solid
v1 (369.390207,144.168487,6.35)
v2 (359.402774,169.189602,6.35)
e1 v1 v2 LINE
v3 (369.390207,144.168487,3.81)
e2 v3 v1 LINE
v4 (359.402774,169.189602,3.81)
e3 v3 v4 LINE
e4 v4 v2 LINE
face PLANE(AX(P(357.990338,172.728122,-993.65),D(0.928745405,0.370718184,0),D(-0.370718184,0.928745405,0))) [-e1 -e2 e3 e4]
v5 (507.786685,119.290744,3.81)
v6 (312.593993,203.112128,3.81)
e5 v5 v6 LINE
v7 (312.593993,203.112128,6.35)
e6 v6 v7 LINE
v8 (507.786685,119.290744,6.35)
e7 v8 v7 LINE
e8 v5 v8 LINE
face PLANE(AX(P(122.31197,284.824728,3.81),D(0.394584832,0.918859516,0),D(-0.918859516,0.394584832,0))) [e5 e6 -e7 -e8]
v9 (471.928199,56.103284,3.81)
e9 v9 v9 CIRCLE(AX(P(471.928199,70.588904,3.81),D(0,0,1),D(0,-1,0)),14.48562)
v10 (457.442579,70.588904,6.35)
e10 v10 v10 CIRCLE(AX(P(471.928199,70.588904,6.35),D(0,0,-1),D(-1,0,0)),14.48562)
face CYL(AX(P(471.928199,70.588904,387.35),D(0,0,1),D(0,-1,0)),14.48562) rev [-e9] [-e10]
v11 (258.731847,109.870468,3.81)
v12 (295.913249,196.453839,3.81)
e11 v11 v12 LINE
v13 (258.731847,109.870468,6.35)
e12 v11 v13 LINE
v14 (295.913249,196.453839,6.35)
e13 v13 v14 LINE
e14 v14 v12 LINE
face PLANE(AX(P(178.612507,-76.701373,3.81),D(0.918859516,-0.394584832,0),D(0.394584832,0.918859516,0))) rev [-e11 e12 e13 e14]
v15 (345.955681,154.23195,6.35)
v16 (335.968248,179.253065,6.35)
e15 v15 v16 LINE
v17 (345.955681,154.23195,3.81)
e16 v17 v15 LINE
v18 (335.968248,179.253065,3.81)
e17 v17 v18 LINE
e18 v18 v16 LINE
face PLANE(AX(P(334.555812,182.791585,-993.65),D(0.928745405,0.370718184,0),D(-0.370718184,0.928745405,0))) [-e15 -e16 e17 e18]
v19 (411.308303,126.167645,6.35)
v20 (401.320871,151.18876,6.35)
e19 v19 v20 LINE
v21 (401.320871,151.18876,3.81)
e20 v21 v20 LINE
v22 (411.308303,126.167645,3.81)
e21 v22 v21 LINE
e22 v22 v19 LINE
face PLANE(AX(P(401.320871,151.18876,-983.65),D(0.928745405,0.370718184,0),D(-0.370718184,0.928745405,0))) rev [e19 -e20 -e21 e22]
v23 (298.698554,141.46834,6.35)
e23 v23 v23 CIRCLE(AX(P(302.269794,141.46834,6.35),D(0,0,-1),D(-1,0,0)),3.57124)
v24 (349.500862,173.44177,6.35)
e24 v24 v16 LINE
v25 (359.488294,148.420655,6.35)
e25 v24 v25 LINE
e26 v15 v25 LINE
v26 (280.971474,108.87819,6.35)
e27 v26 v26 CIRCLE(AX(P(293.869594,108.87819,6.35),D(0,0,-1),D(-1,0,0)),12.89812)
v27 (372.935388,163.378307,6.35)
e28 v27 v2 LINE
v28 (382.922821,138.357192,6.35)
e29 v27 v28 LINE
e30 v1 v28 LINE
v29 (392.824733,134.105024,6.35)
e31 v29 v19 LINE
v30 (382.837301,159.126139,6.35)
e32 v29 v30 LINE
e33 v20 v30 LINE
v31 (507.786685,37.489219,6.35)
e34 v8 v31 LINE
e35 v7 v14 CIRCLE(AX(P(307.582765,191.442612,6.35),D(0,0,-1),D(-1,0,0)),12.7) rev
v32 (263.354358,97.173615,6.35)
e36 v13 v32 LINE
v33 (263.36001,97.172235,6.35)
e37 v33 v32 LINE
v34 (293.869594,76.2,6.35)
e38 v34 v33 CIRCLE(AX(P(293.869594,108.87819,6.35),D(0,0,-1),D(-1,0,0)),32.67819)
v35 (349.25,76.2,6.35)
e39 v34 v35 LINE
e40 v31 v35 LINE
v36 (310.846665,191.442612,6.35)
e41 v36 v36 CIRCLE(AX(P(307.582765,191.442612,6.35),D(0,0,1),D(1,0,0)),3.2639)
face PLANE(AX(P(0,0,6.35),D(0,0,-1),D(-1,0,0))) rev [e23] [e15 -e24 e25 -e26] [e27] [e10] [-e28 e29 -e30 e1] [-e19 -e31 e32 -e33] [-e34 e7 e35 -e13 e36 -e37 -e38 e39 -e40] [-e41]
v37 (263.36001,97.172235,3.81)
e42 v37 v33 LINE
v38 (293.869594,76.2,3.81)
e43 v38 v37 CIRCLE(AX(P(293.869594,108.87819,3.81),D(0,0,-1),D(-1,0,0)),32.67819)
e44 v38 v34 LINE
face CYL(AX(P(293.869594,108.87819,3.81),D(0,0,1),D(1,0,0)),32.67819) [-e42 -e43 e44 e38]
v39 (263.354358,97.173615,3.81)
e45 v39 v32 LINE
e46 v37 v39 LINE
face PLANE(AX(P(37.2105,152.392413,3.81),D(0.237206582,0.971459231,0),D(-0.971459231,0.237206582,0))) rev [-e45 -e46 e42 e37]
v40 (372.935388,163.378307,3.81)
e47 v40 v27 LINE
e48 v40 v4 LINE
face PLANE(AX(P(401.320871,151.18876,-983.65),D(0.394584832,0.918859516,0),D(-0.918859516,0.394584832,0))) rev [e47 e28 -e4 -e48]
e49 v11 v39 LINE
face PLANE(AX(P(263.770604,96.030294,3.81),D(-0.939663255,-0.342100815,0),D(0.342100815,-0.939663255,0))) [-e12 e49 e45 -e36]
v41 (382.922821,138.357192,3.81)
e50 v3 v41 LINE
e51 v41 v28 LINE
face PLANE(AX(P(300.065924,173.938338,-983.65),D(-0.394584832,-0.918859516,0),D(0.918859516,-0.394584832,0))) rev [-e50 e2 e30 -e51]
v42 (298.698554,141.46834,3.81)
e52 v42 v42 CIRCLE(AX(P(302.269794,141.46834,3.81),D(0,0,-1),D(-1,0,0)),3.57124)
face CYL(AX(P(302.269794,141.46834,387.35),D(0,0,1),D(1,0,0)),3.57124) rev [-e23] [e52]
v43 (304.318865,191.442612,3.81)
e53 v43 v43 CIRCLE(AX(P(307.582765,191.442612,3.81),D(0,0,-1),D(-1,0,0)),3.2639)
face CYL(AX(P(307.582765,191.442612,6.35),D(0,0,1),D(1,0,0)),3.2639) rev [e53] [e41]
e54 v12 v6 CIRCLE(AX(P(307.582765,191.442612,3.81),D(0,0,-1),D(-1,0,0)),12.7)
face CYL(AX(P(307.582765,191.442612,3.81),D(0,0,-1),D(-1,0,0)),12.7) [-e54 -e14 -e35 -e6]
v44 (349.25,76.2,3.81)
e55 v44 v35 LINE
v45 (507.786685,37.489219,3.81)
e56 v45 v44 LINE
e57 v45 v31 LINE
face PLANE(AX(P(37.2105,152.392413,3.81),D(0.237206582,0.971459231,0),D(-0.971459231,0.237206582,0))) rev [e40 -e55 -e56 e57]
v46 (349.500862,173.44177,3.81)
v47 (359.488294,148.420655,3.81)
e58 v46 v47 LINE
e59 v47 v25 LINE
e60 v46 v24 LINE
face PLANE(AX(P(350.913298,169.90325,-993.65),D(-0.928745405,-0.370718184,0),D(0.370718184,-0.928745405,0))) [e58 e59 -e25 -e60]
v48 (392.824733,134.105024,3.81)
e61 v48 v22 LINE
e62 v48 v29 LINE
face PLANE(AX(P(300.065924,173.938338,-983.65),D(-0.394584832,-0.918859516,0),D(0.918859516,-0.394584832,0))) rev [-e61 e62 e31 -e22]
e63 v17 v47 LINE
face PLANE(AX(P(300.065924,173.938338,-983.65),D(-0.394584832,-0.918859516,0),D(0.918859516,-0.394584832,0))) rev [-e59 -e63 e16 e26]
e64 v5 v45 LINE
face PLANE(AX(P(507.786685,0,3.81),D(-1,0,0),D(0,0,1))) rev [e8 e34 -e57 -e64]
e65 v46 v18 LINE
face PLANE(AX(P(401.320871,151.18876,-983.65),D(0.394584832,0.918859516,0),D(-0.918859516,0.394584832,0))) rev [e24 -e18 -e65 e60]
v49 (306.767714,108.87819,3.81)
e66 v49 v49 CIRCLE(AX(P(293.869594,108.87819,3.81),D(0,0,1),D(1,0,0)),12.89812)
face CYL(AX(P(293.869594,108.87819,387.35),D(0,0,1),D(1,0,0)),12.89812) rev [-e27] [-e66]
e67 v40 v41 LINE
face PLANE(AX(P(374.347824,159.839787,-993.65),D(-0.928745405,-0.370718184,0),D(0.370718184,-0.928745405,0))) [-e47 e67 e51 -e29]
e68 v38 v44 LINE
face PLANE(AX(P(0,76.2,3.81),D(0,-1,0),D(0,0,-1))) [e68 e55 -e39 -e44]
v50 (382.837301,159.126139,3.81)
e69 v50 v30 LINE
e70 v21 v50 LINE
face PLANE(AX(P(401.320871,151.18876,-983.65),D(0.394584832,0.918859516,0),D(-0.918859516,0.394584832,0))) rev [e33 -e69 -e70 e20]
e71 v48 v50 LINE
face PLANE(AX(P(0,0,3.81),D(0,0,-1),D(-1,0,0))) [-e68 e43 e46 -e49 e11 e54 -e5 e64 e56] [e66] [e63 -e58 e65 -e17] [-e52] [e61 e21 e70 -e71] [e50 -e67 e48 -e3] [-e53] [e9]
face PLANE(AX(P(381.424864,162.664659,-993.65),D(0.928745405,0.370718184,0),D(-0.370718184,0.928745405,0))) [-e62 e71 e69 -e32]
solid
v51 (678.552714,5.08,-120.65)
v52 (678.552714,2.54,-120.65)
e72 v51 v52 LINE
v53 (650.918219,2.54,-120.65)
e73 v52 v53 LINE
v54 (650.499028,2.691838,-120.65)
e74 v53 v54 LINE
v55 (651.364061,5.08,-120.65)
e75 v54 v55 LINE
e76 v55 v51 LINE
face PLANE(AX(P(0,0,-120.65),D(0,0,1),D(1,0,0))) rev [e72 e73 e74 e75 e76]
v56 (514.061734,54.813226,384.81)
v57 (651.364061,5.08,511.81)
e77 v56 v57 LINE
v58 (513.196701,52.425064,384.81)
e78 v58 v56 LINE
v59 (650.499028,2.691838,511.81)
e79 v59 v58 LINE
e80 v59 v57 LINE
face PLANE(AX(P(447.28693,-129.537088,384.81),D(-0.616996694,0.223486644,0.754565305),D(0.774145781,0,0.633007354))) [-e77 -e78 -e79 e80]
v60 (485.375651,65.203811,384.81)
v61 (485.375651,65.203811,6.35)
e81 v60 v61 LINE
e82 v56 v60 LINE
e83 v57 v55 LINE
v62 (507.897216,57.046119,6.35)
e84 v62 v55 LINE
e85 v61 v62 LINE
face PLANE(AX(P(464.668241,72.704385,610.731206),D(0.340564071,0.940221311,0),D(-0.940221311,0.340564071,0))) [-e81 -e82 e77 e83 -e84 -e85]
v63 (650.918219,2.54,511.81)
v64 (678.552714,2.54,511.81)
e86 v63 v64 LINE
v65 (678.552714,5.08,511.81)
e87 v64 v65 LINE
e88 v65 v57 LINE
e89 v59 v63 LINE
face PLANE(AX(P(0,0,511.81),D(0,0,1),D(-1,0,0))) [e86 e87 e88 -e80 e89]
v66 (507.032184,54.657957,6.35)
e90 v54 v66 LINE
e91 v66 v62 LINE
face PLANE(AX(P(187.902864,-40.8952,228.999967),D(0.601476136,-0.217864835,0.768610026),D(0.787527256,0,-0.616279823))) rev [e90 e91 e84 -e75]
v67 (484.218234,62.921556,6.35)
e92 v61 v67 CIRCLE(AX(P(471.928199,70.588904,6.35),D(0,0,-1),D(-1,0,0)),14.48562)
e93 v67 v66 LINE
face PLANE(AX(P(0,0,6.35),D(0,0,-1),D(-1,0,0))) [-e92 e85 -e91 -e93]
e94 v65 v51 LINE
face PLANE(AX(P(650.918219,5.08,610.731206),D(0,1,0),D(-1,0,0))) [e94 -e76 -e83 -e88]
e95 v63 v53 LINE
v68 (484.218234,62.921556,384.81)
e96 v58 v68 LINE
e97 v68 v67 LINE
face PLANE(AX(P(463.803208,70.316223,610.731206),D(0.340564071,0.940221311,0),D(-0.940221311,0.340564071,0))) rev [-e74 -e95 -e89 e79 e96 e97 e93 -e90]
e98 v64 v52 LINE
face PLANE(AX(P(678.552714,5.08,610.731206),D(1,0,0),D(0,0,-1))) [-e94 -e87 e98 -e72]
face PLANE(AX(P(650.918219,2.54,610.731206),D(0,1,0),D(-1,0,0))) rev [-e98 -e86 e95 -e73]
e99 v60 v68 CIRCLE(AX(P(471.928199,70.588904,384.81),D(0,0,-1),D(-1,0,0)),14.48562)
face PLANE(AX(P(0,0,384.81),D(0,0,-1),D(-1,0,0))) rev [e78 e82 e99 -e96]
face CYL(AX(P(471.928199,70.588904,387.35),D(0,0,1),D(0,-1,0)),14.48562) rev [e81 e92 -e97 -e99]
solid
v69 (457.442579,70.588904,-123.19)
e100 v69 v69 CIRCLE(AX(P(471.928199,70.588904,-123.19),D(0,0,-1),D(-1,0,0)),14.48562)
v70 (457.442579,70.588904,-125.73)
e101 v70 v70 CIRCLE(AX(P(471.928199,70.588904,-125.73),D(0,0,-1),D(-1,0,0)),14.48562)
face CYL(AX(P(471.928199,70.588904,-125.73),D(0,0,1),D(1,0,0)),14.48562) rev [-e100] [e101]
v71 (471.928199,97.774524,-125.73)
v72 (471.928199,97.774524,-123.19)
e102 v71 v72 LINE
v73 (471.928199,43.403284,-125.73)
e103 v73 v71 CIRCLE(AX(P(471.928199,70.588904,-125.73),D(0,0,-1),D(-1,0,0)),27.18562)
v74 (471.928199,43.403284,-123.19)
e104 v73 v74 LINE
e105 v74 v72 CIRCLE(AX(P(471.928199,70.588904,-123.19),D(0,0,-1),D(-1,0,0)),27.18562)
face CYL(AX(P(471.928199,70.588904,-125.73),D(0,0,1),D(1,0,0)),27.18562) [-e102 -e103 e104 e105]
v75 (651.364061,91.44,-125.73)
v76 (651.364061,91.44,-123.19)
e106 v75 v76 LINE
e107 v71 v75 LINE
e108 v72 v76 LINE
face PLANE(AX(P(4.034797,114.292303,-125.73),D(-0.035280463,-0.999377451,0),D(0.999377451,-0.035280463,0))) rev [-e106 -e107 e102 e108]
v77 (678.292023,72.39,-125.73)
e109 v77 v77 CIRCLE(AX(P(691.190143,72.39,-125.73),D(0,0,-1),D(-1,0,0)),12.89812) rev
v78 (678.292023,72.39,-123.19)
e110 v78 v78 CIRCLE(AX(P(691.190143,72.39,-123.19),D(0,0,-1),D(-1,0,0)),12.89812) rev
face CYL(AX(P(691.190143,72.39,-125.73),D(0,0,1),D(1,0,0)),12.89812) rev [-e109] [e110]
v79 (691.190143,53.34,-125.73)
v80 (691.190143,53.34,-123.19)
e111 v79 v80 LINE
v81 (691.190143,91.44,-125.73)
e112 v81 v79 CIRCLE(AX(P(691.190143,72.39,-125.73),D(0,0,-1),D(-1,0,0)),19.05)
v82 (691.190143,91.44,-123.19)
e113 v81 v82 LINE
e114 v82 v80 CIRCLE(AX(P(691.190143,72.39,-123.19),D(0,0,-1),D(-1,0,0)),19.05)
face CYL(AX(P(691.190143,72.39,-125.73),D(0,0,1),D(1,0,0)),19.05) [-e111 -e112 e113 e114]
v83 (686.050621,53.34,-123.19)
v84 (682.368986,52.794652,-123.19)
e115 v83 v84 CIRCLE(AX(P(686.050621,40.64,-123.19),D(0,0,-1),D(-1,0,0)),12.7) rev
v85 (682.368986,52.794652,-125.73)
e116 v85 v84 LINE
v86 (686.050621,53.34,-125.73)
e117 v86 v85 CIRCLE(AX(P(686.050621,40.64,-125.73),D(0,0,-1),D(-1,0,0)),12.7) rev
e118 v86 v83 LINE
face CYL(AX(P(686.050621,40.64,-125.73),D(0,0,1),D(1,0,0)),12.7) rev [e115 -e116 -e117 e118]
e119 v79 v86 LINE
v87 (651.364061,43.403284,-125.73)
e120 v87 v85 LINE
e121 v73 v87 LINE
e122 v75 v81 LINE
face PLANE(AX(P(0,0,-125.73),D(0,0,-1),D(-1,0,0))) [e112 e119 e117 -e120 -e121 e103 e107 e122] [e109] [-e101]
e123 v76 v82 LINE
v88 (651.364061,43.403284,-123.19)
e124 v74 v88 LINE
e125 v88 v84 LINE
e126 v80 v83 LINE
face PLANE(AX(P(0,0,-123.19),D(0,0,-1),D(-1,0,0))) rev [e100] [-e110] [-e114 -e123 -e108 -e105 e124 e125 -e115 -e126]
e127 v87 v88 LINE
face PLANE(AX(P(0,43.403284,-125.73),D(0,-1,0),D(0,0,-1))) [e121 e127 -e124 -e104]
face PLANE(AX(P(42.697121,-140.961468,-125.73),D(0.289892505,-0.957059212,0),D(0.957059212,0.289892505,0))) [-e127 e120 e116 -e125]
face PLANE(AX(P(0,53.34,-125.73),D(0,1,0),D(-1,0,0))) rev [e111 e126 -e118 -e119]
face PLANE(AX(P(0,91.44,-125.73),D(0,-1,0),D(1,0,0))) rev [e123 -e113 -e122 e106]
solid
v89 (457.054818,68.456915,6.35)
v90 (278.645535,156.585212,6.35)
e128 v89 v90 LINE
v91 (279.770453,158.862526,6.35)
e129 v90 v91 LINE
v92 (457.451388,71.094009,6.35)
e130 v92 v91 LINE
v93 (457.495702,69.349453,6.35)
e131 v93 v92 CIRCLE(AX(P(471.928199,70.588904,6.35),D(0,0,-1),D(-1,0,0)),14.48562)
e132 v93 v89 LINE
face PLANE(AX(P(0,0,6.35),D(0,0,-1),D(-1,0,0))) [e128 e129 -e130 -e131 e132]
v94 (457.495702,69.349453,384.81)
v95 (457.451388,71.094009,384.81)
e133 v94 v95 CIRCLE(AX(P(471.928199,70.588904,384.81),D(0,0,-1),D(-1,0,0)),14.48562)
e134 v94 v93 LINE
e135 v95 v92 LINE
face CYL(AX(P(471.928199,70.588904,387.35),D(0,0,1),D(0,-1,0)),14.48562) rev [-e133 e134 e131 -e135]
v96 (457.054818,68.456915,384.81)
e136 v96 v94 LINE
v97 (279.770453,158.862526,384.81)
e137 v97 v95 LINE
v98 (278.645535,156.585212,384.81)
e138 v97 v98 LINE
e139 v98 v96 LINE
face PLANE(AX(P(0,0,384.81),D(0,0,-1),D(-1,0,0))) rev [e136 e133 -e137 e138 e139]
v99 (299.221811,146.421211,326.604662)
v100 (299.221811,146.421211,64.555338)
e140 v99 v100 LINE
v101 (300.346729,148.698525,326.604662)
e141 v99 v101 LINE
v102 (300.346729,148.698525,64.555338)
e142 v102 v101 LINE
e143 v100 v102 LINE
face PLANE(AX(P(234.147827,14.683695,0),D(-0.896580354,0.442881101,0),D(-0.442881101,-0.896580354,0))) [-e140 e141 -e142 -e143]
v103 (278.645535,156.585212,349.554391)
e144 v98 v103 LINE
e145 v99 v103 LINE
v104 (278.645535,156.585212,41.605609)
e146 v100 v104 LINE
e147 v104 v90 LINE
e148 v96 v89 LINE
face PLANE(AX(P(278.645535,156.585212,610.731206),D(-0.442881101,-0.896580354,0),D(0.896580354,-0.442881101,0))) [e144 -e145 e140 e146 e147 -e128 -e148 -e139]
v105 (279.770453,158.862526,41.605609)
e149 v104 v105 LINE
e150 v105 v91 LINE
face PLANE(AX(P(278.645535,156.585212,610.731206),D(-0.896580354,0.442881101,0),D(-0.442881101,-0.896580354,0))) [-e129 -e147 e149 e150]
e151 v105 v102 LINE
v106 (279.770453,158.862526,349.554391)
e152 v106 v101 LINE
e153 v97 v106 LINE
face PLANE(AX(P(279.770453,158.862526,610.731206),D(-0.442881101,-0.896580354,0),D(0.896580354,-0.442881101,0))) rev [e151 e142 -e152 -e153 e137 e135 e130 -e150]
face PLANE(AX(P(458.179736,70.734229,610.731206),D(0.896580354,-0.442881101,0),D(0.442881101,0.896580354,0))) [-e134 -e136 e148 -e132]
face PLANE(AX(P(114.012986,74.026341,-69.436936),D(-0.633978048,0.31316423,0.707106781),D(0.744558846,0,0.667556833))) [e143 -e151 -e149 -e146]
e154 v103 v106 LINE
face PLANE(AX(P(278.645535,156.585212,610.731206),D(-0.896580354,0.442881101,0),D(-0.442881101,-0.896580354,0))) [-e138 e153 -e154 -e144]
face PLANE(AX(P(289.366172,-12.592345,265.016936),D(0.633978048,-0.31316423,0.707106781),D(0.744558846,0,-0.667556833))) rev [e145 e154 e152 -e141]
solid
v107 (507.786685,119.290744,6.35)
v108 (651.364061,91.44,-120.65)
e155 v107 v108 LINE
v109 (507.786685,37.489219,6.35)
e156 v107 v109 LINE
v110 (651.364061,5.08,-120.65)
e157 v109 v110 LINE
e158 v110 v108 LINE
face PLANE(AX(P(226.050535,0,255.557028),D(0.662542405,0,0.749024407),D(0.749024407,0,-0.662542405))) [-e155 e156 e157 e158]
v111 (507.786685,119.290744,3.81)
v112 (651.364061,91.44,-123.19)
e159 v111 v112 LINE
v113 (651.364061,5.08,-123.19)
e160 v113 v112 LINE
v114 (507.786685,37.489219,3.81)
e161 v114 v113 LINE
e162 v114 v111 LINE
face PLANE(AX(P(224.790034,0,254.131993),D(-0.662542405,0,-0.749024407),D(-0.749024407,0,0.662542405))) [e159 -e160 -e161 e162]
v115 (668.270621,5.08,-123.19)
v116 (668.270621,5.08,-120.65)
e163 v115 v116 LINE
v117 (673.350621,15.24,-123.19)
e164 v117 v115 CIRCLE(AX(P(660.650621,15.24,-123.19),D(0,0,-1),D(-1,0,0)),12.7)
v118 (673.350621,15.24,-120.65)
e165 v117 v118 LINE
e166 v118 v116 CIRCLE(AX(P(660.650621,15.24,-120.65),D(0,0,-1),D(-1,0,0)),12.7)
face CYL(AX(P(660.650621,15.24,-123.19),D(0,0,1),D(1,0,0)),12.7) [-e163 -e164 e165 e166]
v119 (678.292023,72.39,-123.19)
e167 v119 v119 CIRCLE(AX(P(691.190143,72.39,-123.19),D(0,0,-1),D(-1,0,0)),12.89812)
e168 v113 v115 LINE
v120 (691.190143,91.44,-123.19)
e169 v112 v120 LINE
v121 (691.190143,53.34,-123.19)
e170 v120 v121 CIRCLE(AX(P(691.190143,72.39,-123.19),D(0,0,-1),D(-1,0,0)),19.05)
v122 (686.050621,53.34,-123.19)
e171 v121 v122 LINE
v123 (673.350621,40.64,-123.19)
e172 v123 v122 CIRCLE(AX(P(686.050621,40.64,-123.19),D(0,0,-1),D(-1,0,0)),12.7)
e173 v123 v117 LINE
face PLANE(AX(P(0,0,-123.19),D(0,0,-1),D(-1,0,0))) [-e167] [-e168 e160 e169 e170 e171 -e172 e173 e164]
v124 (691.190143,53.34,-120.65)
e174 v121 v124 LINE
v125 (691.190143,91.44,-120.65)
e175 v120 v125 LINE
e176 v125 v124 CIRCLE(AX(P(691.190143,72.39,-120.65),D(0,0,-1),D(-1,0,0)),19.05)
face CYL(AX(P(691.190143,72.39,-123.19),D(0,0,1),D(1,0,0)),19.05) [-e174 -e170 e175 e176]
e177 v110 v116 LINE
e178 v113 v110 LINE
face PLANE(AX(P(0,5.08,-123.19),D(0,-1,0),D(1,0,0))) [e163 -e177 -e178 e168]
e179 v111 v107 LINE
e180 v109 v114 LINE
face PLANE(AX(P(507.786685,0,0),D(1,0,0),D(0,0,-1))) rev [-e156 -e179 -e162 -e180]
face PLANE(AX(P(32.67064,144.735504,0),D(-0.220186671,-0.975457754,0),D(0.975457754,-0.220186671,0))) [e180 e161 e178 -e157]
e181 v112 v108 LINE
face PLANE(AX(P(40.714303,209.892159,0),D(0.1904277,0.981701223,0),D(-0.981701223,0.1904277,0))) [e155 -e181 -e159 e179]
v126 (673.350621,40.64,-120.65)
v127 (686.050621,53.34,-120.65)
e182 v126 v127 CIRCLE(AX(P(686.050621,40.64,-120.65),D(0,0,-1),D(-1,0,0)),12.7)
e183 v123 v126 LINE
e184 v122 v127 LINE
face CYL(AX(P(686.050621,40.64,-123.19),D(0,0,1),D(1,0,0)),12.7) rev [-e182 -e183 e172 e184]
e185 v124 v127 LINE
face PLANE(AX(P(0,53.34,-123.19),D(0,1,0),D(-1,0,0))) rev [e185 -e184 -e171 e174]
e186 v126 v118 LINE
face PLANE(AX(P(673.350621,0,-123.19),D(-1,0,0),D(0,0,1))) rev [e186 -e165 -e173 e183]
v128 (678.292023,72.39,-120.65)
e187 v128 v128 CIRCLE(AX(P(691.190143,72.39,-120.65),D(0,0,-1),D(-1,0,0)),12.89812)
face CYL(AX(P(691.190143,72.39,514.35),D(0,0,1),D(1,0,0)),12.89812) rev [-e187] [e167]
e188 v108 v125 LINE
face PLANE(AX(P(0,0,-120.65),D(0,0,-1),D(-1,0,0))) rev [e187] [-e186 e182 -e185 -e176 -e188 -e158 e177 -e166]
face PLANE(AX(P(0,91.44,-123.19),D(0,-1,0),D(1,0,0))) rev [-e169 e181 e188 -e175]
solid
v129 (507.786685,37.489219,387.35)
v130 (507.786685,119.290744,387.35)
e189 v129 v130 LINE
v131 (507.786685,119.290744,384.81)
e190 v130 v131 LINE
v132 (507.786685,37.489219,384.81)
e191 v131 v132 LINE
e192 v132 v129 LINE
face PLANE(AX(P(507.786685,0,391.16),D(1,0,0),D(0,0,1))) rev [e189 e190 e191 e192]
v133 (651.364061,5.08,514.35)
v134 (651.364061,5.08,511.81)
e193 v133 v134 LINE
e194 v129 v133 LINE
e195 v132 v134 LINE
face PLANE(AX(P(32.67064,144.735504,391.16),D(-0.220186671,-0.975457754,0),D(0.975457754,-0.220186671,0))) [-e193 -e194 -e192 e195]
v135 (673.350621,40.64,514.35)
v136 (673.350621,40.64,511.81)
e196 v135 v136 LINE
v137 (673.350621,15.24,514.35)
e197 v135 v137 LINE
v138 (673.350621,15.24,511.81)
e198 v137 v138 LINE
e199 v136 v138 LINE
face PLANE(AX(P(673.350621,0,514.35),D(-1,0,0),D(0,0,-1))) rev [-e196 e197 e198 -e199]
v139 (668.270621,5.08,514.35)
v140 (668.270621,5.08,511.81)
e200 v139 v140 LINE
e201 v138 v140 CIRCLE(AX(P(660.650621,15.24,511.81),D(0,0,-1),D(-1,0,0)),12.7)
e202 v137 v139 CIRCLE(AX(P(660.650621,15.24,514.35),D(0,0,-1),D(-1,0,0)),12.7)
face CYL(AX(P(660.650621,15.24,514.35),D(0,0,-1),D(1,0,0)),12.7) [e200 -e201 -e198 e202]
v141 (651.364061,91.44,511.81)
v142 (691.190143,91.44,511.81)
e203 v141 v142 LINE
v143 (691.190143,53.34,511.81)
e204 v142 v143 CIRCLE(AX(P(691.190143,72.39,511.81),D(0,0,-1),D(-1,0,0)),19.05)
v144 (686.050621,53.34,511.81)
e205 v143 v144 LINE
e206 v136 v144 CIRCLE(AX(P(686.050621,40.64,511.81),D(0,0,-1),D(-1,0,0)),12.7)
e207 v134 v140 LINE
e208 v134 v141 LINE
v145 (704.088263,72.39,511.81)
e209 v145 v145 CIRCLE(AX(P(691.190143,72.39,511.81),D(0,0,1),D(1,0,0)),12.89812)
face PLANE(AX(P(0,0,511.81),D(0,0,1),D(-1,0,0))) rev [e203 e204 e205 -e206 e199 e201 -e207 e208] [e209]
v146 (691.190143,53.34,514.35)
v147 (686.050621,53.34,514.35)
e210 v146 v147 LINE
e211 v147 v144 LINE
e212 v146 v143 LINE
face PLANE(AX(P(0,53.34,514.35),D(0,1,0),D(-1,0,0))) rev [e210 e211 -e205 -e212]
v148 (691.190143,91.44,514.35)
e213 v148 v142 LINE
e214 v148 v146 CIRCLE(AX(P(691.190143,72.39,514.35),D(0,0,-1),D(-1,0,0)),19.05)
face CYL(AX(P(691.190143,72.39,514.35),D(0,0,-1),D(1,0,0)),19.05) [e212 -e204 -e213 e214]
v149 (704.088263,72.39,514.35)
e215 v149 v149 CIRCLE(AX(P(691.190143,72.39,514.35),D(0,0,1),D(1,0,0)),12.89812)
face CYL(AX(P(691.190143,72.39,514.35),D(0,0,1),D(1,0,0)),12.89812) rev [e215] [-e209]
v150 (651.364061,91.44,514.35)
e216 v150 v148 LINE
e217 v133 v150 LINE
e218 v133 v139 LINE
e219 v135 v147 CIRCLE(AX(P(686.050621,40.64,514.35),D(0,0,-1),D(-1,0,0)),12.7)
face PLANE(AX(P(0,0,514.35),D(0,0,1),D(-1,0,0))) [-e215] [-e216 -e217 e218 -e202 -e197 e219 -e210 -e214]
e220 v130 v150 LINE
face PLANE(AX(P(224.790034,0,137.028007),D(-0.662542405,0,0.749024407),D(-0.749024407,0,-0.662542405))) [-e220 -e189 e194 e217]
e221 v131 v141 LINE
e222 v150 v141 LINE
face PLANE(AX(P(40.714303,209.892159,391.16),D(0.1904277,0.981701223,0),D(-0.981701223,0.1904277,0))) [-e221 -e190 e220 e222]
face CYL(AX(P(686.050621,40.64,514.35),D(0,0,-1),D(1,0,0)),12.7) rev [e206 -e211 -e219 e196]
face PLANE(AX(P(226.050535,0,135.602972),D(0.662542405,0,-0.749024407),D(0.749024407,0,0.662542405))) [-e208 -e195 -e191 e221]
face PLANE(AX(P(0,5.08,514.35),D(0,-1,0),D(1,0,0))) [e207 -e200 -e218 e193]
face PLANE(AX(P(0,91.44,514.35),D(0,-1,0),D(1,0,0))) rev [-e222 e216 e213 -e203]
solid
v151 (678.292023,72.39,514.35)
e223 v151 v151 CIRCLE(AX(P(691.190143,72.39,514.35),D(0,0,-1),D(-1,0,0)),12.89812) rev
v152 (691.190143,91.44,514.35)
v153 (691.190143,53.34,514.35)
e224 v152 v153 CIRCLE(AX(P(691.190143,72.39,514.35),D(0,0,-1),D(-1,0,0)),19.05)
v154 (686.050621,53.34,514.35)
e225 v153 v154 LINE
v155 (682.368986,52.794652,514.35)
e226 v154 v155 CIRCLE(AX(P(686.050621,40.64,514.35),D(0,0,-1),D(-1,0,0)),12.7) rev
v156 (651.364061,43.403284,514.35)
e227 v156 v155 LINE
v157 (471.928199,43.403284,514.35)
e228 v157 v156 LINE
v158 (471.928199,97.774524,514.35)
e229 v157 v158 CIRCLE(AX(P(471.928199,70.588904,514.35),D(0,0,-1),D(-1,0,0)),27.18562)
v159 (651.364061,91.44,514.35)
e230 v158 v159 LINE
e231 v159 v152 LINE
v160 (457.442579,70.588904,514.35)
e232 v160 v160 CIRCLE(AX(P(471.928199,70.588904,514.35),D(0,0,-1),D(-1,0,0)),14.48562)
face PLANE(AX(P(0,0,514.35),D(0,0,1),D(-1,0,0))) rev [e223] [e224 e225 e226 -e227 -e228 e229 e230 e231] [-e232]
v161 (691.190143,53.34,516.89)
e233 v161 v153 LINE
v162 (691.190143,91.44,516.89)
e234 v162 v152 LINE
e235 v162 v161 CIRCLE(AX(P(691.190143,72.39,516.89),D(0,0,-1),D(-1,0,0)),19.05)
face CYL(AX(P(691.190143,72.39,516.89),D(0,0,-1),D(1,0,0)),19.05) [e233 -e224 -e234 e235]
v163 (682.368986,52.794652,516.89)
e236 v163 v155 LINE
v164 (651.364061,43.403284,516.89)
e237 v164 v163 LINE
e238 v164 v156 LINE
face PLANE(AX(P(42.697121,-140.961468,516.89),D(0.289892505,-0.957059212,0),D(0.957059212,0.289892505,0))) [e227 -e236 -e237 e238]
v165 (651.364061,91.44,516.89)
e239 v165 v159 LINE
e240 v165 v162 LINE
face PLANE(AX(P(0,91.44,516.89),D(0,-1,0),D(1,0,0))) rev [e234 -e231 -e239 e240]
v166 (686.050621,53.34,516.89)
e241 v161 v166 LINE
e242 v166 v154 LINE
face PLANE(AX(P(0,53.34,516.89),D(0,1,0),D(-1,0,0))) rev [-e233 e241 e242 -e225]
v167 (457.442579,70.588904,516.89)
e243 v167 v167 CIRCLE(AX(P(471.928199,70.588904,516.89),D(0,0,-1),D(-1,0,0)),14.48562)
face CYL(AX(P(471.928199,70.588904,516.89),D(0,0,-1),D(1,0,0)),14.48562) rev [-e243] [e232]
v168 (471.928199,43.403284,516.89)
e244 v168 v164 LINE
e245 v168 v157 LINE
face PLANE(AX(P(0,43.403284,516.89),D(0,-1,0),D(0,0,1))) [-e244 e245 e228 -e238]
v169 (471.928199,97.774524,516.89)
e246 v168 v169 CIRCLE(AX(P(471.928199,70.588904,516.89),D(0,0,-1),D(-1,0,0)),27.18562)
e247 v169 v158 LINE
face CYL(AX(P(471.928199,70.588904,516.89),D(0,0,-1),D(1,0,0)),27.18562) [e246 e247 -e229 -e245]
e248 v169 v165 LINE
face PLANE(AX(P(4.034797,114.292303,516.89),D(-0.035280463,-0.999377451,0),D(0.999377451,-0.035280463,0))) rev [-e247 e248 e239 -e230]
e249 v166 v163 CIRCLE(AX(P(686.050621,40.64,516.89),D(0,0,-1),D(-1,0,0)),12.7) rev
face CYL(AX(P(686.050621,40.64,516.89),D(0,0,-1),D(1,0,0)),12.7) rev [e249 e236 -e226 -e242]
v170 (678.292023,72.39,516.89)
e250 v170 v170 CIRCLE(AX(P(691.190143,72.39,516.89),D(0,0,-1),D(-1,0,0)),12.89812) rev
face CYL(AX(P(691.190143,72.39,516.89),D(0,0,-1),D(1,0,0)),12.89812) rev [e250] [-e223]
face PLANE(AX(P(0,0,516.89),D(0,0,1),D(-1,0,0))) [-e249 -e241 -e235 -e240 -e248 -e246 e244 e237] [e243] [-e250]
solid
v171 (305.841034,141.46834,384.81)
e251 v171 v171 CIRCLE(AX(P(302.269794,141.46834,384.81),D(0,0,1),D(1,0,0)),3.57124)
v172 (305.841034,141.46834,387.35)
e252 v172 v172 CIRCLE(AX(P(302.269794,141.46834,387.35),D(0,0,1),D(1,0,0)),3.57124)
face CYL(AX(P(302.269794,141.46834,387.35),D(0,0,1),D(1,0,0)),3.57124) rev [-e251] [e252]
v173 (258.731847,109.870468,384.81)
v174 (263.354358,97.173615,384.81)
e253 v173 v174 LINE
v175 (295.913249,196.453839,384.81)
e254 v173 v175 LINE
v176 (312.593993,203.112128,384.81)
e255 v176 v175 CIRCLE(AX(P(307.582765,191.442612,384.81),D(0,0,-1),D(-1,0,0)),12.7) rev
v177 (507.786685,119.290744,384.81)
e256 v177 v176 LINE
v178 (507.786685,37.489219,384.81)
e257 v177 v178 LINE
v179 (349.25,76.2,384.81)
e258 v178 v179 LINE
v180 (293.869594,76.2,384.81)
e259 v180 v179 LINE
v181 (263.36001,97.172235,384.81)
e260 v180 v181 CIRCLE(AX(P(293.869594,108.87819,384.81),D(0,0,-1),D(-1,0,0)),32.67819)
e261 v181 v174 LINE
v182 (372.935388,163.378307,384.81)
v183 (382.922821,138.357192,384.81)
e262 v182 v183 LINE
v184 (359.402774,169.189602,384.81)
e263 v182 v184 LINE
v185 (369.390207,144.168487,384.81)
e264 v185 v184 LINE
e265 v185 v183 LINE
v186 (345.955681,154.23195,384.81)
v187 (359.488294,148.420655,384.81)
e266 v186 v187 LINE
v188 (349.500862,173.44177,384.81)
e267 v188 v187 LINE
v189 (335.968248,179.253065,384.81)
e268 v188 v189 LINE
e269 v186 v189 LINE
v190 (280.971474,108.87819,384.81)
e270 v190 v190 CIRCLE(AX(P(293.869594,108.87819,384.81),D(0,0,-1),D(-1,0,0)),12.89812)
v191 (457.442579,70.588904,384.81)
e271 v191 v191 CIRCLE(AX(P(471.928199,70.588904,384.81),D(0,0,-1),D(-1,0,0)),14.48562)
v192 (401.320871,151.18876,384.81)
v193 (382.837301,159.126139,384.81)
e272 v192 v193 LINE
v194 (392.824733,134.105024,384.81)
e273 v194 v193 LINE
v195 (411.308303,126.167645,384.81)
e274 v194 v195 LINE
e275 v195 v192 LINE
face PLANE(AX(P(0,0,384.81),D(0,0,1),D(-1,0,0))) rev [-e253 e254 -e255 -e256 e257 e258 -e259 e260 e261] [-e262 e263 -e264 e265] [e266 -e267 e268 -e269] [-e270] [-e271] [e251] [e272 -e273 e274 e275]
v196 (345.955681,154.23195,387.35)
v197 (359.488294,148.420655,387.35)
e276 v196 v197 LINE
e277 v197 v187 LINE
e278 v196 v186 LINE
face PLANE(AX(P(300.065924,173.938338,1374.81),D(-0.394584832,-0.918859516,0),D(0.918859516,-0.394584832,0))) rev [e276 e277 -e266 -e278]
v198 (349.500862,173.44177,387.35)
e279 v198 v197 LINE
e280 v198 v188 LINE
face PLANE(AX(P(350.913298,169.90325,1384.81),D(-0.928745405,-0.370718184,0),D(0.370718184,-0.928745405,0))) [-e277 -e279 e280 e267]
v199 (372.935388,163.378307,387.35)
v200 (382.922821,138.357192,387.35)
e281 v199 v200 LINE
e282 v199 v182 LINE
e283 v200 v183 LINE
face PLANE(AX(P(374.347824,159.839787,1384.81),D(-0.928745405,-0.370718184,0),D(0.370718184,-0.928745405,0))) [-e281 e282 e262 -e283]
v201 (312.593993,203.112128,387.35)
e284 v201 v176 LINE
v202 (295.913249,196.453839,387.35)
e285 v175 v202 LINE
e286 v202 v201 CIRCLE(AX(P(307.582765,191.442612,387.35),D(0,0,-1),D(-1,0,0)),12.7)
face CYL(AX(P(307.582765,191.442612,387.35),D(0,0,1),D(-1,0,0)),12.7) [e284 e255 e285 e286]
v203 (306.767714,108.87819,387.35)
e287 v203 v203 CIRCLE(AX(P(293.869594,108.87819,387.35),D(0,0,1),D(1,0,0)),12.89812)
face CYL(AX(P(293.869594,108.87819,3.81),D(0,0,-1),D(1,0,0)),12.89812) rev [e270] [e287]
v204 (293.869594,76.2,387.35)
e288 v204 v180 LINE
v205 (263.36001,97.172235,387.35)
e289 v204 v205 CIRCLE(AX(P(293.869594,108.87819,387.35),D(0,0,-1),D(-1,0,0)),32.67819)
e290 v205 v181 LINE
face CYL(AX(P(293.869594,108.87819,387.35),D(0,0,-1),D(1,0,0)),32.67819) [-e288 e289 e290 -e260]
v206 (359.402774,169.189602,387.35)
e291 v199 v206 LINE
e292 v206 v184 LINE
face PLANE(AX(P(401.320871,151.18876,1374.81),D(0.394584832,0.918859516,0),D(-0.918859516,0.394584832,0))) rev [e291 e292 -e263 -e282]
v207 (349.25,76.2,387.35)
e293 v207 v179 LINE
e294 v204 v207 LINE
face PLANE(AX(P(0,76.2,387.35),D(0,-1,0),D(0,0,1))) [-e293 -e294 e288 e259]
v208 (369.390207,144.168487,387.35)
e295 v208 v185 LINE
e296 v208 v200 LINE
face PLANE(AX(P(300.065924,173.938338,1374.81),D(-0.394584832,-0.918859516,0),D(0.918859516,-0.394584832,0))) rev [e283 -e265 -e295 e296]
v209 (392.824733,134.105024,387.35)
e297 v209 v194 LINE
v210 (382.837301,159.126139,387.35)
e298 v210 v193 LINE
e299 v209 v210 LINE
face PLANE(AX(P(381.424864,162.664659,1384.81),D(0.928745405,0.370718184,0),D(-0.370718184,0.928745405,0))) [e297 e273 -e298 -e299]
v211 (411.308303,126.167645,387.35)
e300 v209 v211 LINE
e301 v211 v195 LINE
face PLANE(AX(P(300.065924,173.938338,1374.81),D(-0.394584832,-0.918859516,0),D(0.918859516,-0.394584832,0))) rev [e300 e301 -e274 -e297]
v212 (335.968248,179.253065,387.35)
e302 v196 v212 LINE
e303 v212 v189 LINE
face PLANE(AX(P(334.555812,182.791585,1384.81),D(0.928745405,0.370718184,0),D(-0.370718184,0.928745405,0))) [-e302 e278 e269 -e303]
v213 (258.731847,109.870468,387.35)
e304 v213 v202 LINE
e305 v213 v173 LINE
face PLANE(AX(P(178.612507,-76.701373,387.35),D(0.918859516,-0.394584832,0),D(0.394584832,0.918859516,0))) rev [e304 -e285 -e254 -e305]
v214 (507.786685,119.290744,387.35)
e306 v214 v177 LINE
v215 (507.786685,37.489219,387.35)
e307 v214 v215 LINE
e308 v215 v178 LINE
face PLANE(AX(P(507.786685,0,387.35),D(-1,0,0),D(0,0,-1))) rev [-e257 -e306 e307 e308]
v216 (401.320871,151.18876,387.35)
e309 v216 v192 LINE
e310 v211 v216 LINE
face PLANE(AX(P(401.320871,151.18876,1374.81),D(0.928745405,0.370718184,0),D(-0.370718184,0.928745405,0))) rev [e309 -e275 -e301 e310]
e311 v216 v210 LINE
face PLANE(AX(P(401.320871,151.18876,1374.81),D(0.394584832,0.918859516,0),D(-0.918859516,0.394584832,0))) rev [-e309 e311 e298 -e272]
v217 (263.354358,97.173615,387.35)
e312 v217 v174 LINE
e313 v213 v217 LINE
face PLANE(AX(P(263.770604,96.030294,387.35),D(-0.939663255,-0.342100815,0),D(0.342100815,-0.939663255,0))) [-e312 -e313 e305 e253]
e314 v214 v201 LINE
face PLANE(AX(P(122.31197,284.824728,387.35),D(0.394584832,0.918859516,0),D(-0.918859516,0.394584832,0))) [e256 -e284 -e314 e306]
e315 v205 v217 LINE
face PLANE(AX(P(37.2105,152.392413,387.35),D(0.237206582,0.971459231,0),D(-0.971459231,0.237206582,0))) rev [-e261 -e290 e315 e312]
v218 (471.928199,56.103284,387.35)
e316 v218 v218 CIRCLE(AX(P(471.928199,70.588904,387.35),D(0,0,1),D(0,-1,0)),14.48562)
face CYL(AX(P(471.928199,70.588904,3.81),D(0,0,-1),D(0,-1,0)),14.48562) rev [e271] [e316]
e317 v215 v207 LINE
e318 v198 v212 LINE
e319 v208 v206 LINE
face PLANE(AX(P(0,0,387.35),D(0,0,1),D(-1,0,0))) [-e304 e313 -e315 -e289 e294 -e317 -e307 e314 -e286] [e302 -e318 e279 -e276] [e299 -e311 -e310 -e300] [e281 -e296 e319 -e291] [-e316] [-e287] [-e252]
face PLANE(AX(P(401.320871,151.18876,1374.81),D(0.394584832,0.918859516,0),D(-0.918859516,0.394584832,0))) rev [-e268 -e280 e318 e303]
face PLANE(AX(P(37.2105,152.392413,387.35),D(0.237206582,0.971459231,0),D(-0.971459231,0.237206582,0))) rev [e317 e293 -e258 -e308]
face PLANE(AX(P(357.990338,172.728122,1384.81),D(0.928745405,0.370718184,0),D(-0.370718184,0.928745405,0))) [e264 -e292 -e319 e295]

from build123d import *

# Parameters (mm, degrees)
BOSS_EXTRUDE2_START                = 190.5
BOSS_EXTRUDE2_DEPTH                = 2.54
VENT1_START                        = 3.81
VENT1_DEPTH                        = 2.54
FILLET3_R                          = 12.7
EXTRUDE_THIN3_DEPTH                = 378.46
FILLET4_R                          = 12.7
SKETCH6_W                          = 14.48562
SKETCH6_H                          = 383.54
F_1_1_8_CLEARANCE_HOLE1_AT_2_COUNT = 2
F_1_1_8_CLEARANCE_HOLE1_AT_2_PITCH = 219.269341855
SKETCH8_W                          = 12.89812
SKETCH8_H                          = 383.54
CUT_EXTRUDE3_START                 = -2.54
SKETCH13_R                         = 14.48562
CUT_EXTRUDE3_DEPTH                 = 2.54
BOSS_EXTRUDE3_DEPTH                = 2.54
BOSS_EXTRUDE4_DEPTH                = 127
BOSS_EXTRUDE5_DEPTH                = 2.54
BOSS_EXTRUDE11_DEPTH               = 2.54
BOSS_EXTRUDE7_DEPTH                = 2.54
BOSS_EXTRUDE8_DEPTH                = 127
SKETCH22_W                         = 12.89812
SKETCH22_H                         = 637.540025
SKETCH24_R                         = 12.89812
SKETCH24_R_2                       = 14.48562
BOSS_EXTRUDE9_DEPTH                = 2.54
CUT_EXTRUDE4_DEPTH                 = 821.847958154
SKETCH28_W                         = 3.2639
SKETCH28_H                         = 132.08
SKETCH35_W                         = 3.57124
SKETCH35_H                         = 513.08


# Read off the part's stored shape, not the designer's step: Vent1, Extrude-Thin3
with BuildPart() as part:
    # Sketch2 → Boss-Extrude2 (new body)
    with BuildSketch(Plane(origin=(0, 0, 196.85), x_dir=(-1, 0, 0), z_dir=(0, 0, -1)).offset(BOSS_EXTRUDE2_START)):
        with BuildLine():
            Line((-349.25, 76.2), (-293.869593793, 76.2))
            ThreePointArc((-293.869593793, 76.2), (-275.358317793, 81.948712351), (-263.360009608, 97.172234727))
            Line((-263.360009608, 97.172234727), (-263.354358358, 97.173614624))
            Line((-263.354358358, 97.173614624), (-258.731847293, 109.870467716))
            Line((-258.731847293, 109.870467716), (-300.924476703, 208.123354944))
            Line((-300.924476703, 208.123354944), (-572.64199408, 91.44))
            Line((-572.64199408, 91.44), (-691.190143255, 91.44))
            ThreePointArc((-691.190143255, 91.44), (-710.240143255, 72.39), (-691.190143255, 53.34))
            Line((-691.190143255, 53.34), (-673.350620795, 53.34))
            Line((-673.350620795, 53.34), (-673.350620795, 2.54))
            Line((-673.350620795, 2.54), (-650.918218697, 2.54))
            Line((-650.918218697, 2.54), (-349.25, 76.2))
        make_face()
    extrude(amount=BOSS_EXTRUDE2_DEPTH)

    # Vent1 outline → Vent1 (cut)
    with BuildSketch(Plane.XY.offset(VENT1_START)):
        Polygon((312.53372146, 189.316528007), (322.521154182, 164.295413171), (336.053768002, 158.484117687), (326.06633528, 183.505232523), align=None)
        Polygon((335.968247831, 179.253065095), (345.955680553, 154.23195026), (359.488294373, 148.420654776), (349.500861651, 173.441769611), align=None)
        Polygon((359.402774202, 169.189602184), (369.390206924, 144.168487348), (382.922820744, 138.357191864), (372.935388022, 163.3783067), align=None)
        Polygon((382.837300573, 159.126139273), (392.824733295, 134.105024437), (411.308303391, 126.167645239), (401.320870668, 151.188760075), align=None)
        Polygon((305.456681471, 186.491655445), (300.065924128, 173.938337941), (312.619241631, 168.547580599), align=None)
    extrude(amount=VENT1_DEPTH, mode=Mode.SUBTRACT)

    # Fillet3
    fillet3_edges = [part.edges().sort_by_distance(p)[0] for p in [
        (673.350620795, 2.54, 5.08),
        (673.350620795, 53.34, 5.08),
    ]]
    fillet(fillet3_edges, radius=FILLET3_R)


with BuildPart() as body_2:
    # Body-Move/Copy1: copy of part
    add(part.part.moved(Location((0, 0, 381))))


with BuildPart() as body_3:
    # Extrude-Thin3 outline → Extrude-Thin3 (new body)
    with BuildSketch(Plane.XY.offset(6.35)):
        Polygon((463.803208288, 70.316223369), (650.918218697, 2.54), (678.552714292, 2.54), (678.552714292, 5.08), (651.364061001, 5.08), (464.668241028, 72.704385499), align=None)
        Polygon((458.179736182, 70.734229025), (279.770453085, 158.862526074), (278.645535089, 156.585211976), (457.054818185, 68.456914927), align=None)
    extrude(amount=EXTRUDE_THIN3_DEPTH)


with BuildPart() as part_1:
    add(part.part)

    # Fillet4
    fillet4_edges = [part_1.edges().sort_by_distance(p)[0] for p in [
        (300.924476703, 208.123354944, 5.08),
    ]]
    fillet(fillet4_edges, radius=FILLET4_R)


with BuildPart() as f_1_1_8_clearance_hole1_tool:
    # Sketch6 → 1-1/8 Clearance Hole1 (revolve)
    with BuildSketch(Plane(origin=(691.190143255, 72.39, 387.35), x_dir=(0, -1, 0), z_dir=(1, 0, 0))):
        with Locations((7.24281, 191.77)):
            Rectangle(SKETCH6_W, SKETCH6_H)
    f_1_1_8_clearance_hole1 = revolve(axis=Axis((691.190143255, 72.39, 393.7), (0, 0, -1)))


with BuildPart() as part_2:
    add(part_1.part)

    # 1-1/8 Clearance Hole1: cut by f_1_1_8_clearance_hole1_tool
    add(f_1_1_8_clearance_hole1_tool.part, mode=Mode.SUBTRACT)


with BuildPart() as body_2_1:
    add(body_2.part)

    # 1-1/8 Clearance Hole1: cut by f_1_1_8_clearance_hole1_tool
    add(f_1_1_8_clearance_hole1_tool.part, mode=Mode.SUBTRACT)


with BuildPart() as f_1_1_8_clearance_hole1_at_2_tool:
    # 1-1/8 Clearance Hole1 at 2: 1-1/8 Clearance Hole1 ×2
    with Locations(*[Vector(-0.9999662638682391, -0.00821408092213147, 0) * (i * F_1_1_8_CLEARANCE_HOLE1_AT_2_PITCH) for i in range(1, F_1_1_8_CLEARANCE_HOLE1_AT_2_COUNT)]):
        add(f_1_1_8_clearance_hole1)


with BuildPart() as part_3:
    add(part_2.part)

    # 1-1/8 Clearance Hole1 at 2: cut by f_1_1_8_clearance_hole1_at_2_tool
    add(f_1_1_8_clearance_hole1_at_2_tool.part, mode=Mode.SUBTRACT)


with BuildPart() as body_2_2:
    add(body_2_1.part)

    # 1-1/8 Clearance Hole1 at 2: cut by f_1_1_8_clearance_hole1_at_2_tool
    add(f_1_1_8_clearance_hole1_at_2_tool.part, mode=Mode.SUBTRACT)


with BuildPart() as body_3_1:
    add(body_3.part)

    # 1-1/8 Clearance Hole1 at 2: cut by f_1_1_8_clearance_hole1_at_2_tool
    add(f_1_1_8_clearance_hole1_at_2_tool.part, mode=Mode.SUBTRACT)

    # Sketch10 → Boss-Extrude3 (add)
    with BuildSketch(Plane(origin=(77.174379507, 213.061219806, 0), x_dir=(0.9402213111169273, -0.34056407050886367, 0), z_dir=(0.34056407050886367, 0.9402213111169273, 0))):
        Polygon((610.696305971, 120.65), (458.107928239, -6.35), (464.664381949, -6.35), (610.696305971, -6.35), align=None)
    extrude(amount=-BOSS_EXTRUDE3_DEPTH)

    # Sketch15 → Boss-Extrude4 (add)
    with BuildSketch(Plane(origin=(0, 0, 6.35), x_dir=(-1, 0, 0), z_dir=(0, 0, -1))):
        Polygon((-650.918218697, 2.54), (-650.499028262, 2.69183787), (-651.364061001, 5.08), (-678.552714292, 5.08), (-678.552714292, 2.54), align=None)
    extrude(amount=BOSS_EXTRUDE4_DEPTH)



with BuildPart() as f_1_clearance_hole1_tool:
    # Sketch8 → 1 Clearance Hole1 (revolve)
    with BuildSketch(Plane(origin=(293.869593793, 108.878190342, 387.35), x_dir=(0, -1, 0), z_dir=(1, 0, 0))):
        with Locations((6.44906, 191.77)):
            Rectangle(SKETCH8_W, SKETCH8_H)
    revolve(axis=Axis((293.869593793, 108.878190342, 393.7), (0, 0, -1)))


with BuildPart() as part_4:
    add(part_3.part)

    # 1 Clearance Hole1: cut by f_1_clearance_hole1_tool
    add(f_1_clearance_hole1_tool.part, mode=Mode.SUBTRACT)

    # Sketch13 → Cut-Extrude3 (cut)
    # profile 1 of 3: a face of its own
    with BuildSketch(Plane.XY.offset(6.35).offset(CUT_EXTRUDE3_START)):
        Polygon((507.786685374, 37.489219345), (650.918218697, 2.54), (507.786685374, 105.764971846), align=None)
    # profile 2 of 3: a face of its own
    with BuildSketch(Plane.XY.offset(6.35).offset(CUT_EXTRUDE3_START)):
        with BuildLine():
            Line((507.786685374, 105.764971846), (650.918218697, 2.54))
            Line((650.918218697, 2.54), (660.650620795, 2.54))
            ThreePointArc((660.650620795, 2.54), (669.630876916, 6.259743879), (673.350620795, 15.24))
            Line((673.350620795, 15.24), (673.350620795, 40.64))
            ThreePointArc((673.350620795, 40.64), (677.070364674, 49.620256121), (686.050620795, 53.34))
            Line((686.050620795, 53.34), (691.190143255, 53.34))
            ThreePointArc((691.190143255, 53.34), (710.240143255, 72.39), (691.190143255, 91.44))
            Line((691.190143255, 91.44), (572.64199408, 91.44))
            Line((572.64199408, 91.44), (507.786685374, 119.290743959))
            Line((507.786685374, 119.290743959), (507.786685374, 105.764971846))
        make_face()
        with Locations(Location((691.190143255, 72.39, 0), (0, 0, 270))):
            Circle(SKETCH13_R, mode=Mode.SUBTRACT)
    # profile 3 of 3: a face of its own
    with BuildSketch(Plane.XY.offset(6.35).offset(CUT_EXTRUDE3_START)):
        with BuildLine():
            Line((660.650620795, 2.54), (650.918218697, 2.54))
            Line((650.918218697, 2.54), (507.786685374, 37.489219345))
            Line((507.786685374, 37.489219345), (507.786685374, 32.312256985))
            Line((507.786685374, 32.312256985), (691.190143255, -16.865030172))
            Line((691.190143255, -16.865030172), (673.350620795, 15.24))
            ThreePointArc((673.350620795, 15.24), (669.630876916, 6.259743879), (660.650620795, 2.54))
        make_face()
    extrude(amount=CUT_EXTRUDE3_DEPTH, mode=Mode.SUBTRACT)

    # Sketch26 → Boss-Extrude11 (add)
    with BuildSketch(Plane.XY.offset(6.35)):
        Polygon((305.456681471, 186.491655445), (300.065924128, 173.938337941), (312.619241631, 168.547580599), align=None)
        Polygon((326.06633528, 183.505232523), (312.53372146, 189.316528007), (322.521154182, 164.295413171), (336.053768002, 158.484117687), align=None)
    extrude(amount=-BOSS_EXTRUDE11_DEPTH)


with BuildPart() as body_2_3:
    add(body_2_2.part)

    # 1 Clearance Hole1: cut by f_1_clearance_hole1_tool
    add(f_1_clearance_hole1_tool.part, mode=Mode.SUBTRACT)


with BuildPart() as body_4:
    # Sketch16 → Boss-Extrude5 (new body)
    with BuildSketch(Plane(origin=(0, 0, -120.65), x_dir=(-1, 0, 0), z_dir=(0, 0, -1))):
        with BuildLine():
            Line((-668.270620795, 5.08), (-651.364061001, 5.08))
            Line((-651.364061001, 5.08), (-651.364061001, 91.44))
            Line((-651.364061001, 91.44), (-691.190143255, 91.44))
            ThreePointArc((-691.190143255, 91.44), (-710.240143255, 72.39), (-691.190143255, 53.34))
            Line((-691.190143255, 53.34), (-686.050620795, 53.34))
            ThreePointArc((-686.050620795, 53.34), (-677.070364674, 49.620256121), (-673.350620795, 40.64))
            Line((-673.350620795, 40.64), (-673.350620795, 15.24))
            ThreePointArc((-673.350620795, 15.24), (-672.009846121, 9.560387337), (-668.270620795, 5.08))
        make_face()
    extrude(amount=BOSS_EXTRUDE5_DEPTH)

    # Sketch17 → Loft1 section 0
    with BuildSketch(Plane(origin=(507.786685374, 433.92918903, 0), x_dir=(0, 0, -1), z_dir=(1, 0, 0))):
        with BuildLine():
            Line((-6.35, -396.439969685), (-3.81, -396.439969685))
            Line((-3.81, -396.439969685), (-3.81, -314.63844507))
            Line((-3.81, -314.63844507), (-6.35, -314.63844507))
            Line((-6.35, -314.63844507), (-6.35, -396.439969685))
        make_face()
    # Sketch18 → Loft1 section 1
    with BuildSketch(Plane.ZY.offset(-651.364061001)):
        with BuildLine():
            Line((-120.65, 5.08), (-120.65, 91.44))
            Line((-120.65, 91.44), (-123.19, 91.44))
            Line((-123.19, 91.44), (-123.19, 5.08))
            Line((-123.19, 5.08), (-120.65, 5.08))
        make_face()
    loft()


with BuildPart() as body_4_2:
    # Mirror2: mirrored copy
    add(body_4.part.mirror(Plane.XY.offset(195.58)))


with BuildPart() as body_5:
    # Mirror2 2: mirrored copy
    add(part_4.part.mirror(Plane.XY.offset(195.58)))


with BuildPart() as body_3_2:
    add(body_3_1.part)

    add(body_4_2.part)  # Boss-Extrude7 merges body 4 2
    # Sketch19 → Boss-Extrude7 (add)
    with BuildSketch(Plane(origin=(77.174379507, 213.061219806, 0), x_dir=(0.9402213111169273, -0.34056407050886367, 0), z_dir=(0.34056407050886367, 0.9402213111169273, 0))):
        Polygon((464.664381949, -384.81), (610.696305971, -511.81), (610.696305971, -384.81), align=None)
    extrude(amount=-BOSS_EXTRUDE7_DEPTH)

    # Sketch20 → Boss-Extrude8 (add)
    with BuildSketch(Plane.XY.offset(384.81)):
        Polygon((650.918218697, 2.54), (678.552714292, 2.54), (678.552714292, 5.08), (651.364061001, 5.08), (650.499028262, 2.69183787), align=None)
    extrude(amount=BOSS_EXTRUDE8_DEPTH)


with BuildPart() as f_1_clearance_hole2_tool:
    # Sketch22 → 1 Clearance Hole2 (revolve)
    with BuildSketch(Plane(origin=(691.190143255, 72.39, 514.35), x_dir=(0, -1, 0), z_dir=(1, 0, 0))):
        with Locations((6.44906, 318.7700125)):
            Rectangle(SKETCH22_W, SKETCH22_H)
    revolve(axis=Axis((691.190143255, 72.39, 520.7), (0, 0, -1)))


with BuildPart() as body_3_3:
    add(body_3_2.part)

    # 1 Clearance Hole2: cut by f_1_clearance_hole2_tool
    add(f_1_clearance_hole2_tool.part, mode=Mode.SUBTRACT)

    # Sketch25 → Cut-Extrude4 (cut, through all)
    with BuildSketch(Plane(origin=(117.956095946, 238.793477454, 0), x_dir=(0.8965803535519616, -0.4428811010018824, 0), z_dir=(0.4428811010018824, 0.8965803535519616, 0))):
        Polygon((180.479481285, -41.605609291), (180.479481285, -195.58), (203.429210289, -195.58), (203.429210289, -64.555338295), align=None)
        Polygon((203.429210289, -195.58), (180.479481285, -195.58), (180.479481285, -349.554390709), (203.429210289, -326.604661705), align=None)
    extrude(amount=-CUT_EXTRUDE4_DEPTH, mode=Mode.SUBTRACT)


with BuildPart() as body_4_1:
    add(body_4.part)

    # 1 Clearance Hole2: cut by f_1_clearance_hole2_tool
    add(f_1_clearance_hole2_tool.part, mode=Mode.SUBTRACT)


with BuildPart() as body_5_2:
    # Sketch24 → Boss-Extrude9 (new body)
    # profile 1 of 3: a face of its own
    with BuildSketch(Plane(origin=(0, 0, -123.19), x_dir=(-1, 0, 0), z_dir=(0, 0, -1))):
        with BuildLine():
            ThreePointArc((-471.9281987, 43.403283882), (-499.096894311, 69.629782617), (-473.845247029, 97.706847397))
            Line((-473.845247029, 97.706847397), (-651.364061001, 91.44))
            Line((-651.364061001, 91.44), (-651.364061001, 43.403283882))
            Line((-651.364061001, 43.403283882), (-471.9281987, 43.403283882))
        make_face()
    # profile 2 of 3: a face of its own
    with BuildSketch(Plane(origin=(0, 0, -123.19), x_dir=(-1, 0, 0), z_dir=(0, 0, -1))):
        with BuildLine():
            Line((-651.364061001, 43.403283882), (-651.364061001, 91.44))
            Line((-651.364061001, 91.44), (-691.190143255, 91.44))
            ThreePointArc((-691.190143255, 91.44), (-710.240143255, 72.39), (-691.190143255, 53.34))
            Line((-691.190143255, 53.34), (-686.050620795, 53.34))
            ThreePointArc((-686.050620795, 53.34), (-684.189717833, 53.202923233), (-682.368985983, 52.794651995))
            Line((-682.368985983, 52.794651995), (-651.364061001, 43.403283882))
        make_face()
        with Locations((-691.190143255, 72.39)):
            Circle(SKETCH24_R, mode=Mode.SUBTRACT)
    # profile 3 of 3: a face of its own
    with BuildSketch(Plane(origin=(0, 0, -123.19), x_dir=(-1, 0, 0), z_dir=(0, 0, -1))):
        with BuildLine():
            ThreePointArc((-444.7425787, 70.588903882), (-452.705062447, 89.812040135), (-471.9281987, 97.774523882))
            Line((-471.9281987, 97.774523882), (-473.845247029, 97.706847397))
            ThreePointArc((-473.845247029, 97.706847397), (-499.096894311, 69.629782617), (-471.9281987, 43.403283882))
            ThreePointArc((-471.9281987, 43.403283882), (-452.705062447, 51.36576763), (-444.7425787, 70.588903882))
        make_face()
        with Locations((-471.9281987, 70.588903882)):
            Circle(SKETCH24_R_2, mode=Mode.SUBTRACT)
    extrude(amount=BOSS_EXTRUDE9_DEPTH)


with BuildPart() as body_6:
    # Mirror3: mirrored copy
    add(body_5_2.part.mirror(Plane.XY.offset(195.58)))


with BuildPart() as part_5:
    add(part_4.part)

    # Sketch28 → 1/4 Clearance Hole1 (revolve, cut)
    with BuildSketch(Plane(origin=(307.582765184, 191.44261172, 6.35), x_dir=(0, -1, 0), z_dir=(1, 0, 0))):
        with Locations((1.63195, 66.04)):
            Rectangle(SKETCH28_W, SKETCH28_H)
    revolve(axis=Axis((307.582765184, 191.44261172, 12.7), (0, 0, -1)), mode=Mode.SUBTRACT)


with BuildPart() as f_1_4_clearance_hole3_tool:
    # Sketch35 → 1/4 Clearance Hole3 (revolve)
    with BuildSketch(Plane(origin=(302.269794085, 141.468340304, 387.35), x_dir=(0, -1, 0), z_dir=(1, 0, 0))):
        with Locations((1.78562, 256.54)):
            Rectangle(SKETCH35_W, SKETCH35_H)
    revolve(axis=Axis((302.269794085, 141.468340304, 393.7), (0, 0, -1)))


with BuildPart() as part_6:
    add(part_5.part)

    # 1/4 Clearance Hole3: cut by f_1_4_clearance_hole3_tool
    add(f_1_4_clearance_hole3_tool.part, mode=Mode.SUBTRACT)


with BuildPart() as body_5_1:
    add(body_5.part)

    # 1/4 Clearance Hole3: cut by f_1_4_clearance_hole3_tool
    add(f_1_4_clearance_hole3_tool.part, mode=Mode.SUBTRACT)


solid = Compound([body_3_3.part, body_4_1.part, body_5_2.part, body_6.part, part_6.part, body_5_1.part])
